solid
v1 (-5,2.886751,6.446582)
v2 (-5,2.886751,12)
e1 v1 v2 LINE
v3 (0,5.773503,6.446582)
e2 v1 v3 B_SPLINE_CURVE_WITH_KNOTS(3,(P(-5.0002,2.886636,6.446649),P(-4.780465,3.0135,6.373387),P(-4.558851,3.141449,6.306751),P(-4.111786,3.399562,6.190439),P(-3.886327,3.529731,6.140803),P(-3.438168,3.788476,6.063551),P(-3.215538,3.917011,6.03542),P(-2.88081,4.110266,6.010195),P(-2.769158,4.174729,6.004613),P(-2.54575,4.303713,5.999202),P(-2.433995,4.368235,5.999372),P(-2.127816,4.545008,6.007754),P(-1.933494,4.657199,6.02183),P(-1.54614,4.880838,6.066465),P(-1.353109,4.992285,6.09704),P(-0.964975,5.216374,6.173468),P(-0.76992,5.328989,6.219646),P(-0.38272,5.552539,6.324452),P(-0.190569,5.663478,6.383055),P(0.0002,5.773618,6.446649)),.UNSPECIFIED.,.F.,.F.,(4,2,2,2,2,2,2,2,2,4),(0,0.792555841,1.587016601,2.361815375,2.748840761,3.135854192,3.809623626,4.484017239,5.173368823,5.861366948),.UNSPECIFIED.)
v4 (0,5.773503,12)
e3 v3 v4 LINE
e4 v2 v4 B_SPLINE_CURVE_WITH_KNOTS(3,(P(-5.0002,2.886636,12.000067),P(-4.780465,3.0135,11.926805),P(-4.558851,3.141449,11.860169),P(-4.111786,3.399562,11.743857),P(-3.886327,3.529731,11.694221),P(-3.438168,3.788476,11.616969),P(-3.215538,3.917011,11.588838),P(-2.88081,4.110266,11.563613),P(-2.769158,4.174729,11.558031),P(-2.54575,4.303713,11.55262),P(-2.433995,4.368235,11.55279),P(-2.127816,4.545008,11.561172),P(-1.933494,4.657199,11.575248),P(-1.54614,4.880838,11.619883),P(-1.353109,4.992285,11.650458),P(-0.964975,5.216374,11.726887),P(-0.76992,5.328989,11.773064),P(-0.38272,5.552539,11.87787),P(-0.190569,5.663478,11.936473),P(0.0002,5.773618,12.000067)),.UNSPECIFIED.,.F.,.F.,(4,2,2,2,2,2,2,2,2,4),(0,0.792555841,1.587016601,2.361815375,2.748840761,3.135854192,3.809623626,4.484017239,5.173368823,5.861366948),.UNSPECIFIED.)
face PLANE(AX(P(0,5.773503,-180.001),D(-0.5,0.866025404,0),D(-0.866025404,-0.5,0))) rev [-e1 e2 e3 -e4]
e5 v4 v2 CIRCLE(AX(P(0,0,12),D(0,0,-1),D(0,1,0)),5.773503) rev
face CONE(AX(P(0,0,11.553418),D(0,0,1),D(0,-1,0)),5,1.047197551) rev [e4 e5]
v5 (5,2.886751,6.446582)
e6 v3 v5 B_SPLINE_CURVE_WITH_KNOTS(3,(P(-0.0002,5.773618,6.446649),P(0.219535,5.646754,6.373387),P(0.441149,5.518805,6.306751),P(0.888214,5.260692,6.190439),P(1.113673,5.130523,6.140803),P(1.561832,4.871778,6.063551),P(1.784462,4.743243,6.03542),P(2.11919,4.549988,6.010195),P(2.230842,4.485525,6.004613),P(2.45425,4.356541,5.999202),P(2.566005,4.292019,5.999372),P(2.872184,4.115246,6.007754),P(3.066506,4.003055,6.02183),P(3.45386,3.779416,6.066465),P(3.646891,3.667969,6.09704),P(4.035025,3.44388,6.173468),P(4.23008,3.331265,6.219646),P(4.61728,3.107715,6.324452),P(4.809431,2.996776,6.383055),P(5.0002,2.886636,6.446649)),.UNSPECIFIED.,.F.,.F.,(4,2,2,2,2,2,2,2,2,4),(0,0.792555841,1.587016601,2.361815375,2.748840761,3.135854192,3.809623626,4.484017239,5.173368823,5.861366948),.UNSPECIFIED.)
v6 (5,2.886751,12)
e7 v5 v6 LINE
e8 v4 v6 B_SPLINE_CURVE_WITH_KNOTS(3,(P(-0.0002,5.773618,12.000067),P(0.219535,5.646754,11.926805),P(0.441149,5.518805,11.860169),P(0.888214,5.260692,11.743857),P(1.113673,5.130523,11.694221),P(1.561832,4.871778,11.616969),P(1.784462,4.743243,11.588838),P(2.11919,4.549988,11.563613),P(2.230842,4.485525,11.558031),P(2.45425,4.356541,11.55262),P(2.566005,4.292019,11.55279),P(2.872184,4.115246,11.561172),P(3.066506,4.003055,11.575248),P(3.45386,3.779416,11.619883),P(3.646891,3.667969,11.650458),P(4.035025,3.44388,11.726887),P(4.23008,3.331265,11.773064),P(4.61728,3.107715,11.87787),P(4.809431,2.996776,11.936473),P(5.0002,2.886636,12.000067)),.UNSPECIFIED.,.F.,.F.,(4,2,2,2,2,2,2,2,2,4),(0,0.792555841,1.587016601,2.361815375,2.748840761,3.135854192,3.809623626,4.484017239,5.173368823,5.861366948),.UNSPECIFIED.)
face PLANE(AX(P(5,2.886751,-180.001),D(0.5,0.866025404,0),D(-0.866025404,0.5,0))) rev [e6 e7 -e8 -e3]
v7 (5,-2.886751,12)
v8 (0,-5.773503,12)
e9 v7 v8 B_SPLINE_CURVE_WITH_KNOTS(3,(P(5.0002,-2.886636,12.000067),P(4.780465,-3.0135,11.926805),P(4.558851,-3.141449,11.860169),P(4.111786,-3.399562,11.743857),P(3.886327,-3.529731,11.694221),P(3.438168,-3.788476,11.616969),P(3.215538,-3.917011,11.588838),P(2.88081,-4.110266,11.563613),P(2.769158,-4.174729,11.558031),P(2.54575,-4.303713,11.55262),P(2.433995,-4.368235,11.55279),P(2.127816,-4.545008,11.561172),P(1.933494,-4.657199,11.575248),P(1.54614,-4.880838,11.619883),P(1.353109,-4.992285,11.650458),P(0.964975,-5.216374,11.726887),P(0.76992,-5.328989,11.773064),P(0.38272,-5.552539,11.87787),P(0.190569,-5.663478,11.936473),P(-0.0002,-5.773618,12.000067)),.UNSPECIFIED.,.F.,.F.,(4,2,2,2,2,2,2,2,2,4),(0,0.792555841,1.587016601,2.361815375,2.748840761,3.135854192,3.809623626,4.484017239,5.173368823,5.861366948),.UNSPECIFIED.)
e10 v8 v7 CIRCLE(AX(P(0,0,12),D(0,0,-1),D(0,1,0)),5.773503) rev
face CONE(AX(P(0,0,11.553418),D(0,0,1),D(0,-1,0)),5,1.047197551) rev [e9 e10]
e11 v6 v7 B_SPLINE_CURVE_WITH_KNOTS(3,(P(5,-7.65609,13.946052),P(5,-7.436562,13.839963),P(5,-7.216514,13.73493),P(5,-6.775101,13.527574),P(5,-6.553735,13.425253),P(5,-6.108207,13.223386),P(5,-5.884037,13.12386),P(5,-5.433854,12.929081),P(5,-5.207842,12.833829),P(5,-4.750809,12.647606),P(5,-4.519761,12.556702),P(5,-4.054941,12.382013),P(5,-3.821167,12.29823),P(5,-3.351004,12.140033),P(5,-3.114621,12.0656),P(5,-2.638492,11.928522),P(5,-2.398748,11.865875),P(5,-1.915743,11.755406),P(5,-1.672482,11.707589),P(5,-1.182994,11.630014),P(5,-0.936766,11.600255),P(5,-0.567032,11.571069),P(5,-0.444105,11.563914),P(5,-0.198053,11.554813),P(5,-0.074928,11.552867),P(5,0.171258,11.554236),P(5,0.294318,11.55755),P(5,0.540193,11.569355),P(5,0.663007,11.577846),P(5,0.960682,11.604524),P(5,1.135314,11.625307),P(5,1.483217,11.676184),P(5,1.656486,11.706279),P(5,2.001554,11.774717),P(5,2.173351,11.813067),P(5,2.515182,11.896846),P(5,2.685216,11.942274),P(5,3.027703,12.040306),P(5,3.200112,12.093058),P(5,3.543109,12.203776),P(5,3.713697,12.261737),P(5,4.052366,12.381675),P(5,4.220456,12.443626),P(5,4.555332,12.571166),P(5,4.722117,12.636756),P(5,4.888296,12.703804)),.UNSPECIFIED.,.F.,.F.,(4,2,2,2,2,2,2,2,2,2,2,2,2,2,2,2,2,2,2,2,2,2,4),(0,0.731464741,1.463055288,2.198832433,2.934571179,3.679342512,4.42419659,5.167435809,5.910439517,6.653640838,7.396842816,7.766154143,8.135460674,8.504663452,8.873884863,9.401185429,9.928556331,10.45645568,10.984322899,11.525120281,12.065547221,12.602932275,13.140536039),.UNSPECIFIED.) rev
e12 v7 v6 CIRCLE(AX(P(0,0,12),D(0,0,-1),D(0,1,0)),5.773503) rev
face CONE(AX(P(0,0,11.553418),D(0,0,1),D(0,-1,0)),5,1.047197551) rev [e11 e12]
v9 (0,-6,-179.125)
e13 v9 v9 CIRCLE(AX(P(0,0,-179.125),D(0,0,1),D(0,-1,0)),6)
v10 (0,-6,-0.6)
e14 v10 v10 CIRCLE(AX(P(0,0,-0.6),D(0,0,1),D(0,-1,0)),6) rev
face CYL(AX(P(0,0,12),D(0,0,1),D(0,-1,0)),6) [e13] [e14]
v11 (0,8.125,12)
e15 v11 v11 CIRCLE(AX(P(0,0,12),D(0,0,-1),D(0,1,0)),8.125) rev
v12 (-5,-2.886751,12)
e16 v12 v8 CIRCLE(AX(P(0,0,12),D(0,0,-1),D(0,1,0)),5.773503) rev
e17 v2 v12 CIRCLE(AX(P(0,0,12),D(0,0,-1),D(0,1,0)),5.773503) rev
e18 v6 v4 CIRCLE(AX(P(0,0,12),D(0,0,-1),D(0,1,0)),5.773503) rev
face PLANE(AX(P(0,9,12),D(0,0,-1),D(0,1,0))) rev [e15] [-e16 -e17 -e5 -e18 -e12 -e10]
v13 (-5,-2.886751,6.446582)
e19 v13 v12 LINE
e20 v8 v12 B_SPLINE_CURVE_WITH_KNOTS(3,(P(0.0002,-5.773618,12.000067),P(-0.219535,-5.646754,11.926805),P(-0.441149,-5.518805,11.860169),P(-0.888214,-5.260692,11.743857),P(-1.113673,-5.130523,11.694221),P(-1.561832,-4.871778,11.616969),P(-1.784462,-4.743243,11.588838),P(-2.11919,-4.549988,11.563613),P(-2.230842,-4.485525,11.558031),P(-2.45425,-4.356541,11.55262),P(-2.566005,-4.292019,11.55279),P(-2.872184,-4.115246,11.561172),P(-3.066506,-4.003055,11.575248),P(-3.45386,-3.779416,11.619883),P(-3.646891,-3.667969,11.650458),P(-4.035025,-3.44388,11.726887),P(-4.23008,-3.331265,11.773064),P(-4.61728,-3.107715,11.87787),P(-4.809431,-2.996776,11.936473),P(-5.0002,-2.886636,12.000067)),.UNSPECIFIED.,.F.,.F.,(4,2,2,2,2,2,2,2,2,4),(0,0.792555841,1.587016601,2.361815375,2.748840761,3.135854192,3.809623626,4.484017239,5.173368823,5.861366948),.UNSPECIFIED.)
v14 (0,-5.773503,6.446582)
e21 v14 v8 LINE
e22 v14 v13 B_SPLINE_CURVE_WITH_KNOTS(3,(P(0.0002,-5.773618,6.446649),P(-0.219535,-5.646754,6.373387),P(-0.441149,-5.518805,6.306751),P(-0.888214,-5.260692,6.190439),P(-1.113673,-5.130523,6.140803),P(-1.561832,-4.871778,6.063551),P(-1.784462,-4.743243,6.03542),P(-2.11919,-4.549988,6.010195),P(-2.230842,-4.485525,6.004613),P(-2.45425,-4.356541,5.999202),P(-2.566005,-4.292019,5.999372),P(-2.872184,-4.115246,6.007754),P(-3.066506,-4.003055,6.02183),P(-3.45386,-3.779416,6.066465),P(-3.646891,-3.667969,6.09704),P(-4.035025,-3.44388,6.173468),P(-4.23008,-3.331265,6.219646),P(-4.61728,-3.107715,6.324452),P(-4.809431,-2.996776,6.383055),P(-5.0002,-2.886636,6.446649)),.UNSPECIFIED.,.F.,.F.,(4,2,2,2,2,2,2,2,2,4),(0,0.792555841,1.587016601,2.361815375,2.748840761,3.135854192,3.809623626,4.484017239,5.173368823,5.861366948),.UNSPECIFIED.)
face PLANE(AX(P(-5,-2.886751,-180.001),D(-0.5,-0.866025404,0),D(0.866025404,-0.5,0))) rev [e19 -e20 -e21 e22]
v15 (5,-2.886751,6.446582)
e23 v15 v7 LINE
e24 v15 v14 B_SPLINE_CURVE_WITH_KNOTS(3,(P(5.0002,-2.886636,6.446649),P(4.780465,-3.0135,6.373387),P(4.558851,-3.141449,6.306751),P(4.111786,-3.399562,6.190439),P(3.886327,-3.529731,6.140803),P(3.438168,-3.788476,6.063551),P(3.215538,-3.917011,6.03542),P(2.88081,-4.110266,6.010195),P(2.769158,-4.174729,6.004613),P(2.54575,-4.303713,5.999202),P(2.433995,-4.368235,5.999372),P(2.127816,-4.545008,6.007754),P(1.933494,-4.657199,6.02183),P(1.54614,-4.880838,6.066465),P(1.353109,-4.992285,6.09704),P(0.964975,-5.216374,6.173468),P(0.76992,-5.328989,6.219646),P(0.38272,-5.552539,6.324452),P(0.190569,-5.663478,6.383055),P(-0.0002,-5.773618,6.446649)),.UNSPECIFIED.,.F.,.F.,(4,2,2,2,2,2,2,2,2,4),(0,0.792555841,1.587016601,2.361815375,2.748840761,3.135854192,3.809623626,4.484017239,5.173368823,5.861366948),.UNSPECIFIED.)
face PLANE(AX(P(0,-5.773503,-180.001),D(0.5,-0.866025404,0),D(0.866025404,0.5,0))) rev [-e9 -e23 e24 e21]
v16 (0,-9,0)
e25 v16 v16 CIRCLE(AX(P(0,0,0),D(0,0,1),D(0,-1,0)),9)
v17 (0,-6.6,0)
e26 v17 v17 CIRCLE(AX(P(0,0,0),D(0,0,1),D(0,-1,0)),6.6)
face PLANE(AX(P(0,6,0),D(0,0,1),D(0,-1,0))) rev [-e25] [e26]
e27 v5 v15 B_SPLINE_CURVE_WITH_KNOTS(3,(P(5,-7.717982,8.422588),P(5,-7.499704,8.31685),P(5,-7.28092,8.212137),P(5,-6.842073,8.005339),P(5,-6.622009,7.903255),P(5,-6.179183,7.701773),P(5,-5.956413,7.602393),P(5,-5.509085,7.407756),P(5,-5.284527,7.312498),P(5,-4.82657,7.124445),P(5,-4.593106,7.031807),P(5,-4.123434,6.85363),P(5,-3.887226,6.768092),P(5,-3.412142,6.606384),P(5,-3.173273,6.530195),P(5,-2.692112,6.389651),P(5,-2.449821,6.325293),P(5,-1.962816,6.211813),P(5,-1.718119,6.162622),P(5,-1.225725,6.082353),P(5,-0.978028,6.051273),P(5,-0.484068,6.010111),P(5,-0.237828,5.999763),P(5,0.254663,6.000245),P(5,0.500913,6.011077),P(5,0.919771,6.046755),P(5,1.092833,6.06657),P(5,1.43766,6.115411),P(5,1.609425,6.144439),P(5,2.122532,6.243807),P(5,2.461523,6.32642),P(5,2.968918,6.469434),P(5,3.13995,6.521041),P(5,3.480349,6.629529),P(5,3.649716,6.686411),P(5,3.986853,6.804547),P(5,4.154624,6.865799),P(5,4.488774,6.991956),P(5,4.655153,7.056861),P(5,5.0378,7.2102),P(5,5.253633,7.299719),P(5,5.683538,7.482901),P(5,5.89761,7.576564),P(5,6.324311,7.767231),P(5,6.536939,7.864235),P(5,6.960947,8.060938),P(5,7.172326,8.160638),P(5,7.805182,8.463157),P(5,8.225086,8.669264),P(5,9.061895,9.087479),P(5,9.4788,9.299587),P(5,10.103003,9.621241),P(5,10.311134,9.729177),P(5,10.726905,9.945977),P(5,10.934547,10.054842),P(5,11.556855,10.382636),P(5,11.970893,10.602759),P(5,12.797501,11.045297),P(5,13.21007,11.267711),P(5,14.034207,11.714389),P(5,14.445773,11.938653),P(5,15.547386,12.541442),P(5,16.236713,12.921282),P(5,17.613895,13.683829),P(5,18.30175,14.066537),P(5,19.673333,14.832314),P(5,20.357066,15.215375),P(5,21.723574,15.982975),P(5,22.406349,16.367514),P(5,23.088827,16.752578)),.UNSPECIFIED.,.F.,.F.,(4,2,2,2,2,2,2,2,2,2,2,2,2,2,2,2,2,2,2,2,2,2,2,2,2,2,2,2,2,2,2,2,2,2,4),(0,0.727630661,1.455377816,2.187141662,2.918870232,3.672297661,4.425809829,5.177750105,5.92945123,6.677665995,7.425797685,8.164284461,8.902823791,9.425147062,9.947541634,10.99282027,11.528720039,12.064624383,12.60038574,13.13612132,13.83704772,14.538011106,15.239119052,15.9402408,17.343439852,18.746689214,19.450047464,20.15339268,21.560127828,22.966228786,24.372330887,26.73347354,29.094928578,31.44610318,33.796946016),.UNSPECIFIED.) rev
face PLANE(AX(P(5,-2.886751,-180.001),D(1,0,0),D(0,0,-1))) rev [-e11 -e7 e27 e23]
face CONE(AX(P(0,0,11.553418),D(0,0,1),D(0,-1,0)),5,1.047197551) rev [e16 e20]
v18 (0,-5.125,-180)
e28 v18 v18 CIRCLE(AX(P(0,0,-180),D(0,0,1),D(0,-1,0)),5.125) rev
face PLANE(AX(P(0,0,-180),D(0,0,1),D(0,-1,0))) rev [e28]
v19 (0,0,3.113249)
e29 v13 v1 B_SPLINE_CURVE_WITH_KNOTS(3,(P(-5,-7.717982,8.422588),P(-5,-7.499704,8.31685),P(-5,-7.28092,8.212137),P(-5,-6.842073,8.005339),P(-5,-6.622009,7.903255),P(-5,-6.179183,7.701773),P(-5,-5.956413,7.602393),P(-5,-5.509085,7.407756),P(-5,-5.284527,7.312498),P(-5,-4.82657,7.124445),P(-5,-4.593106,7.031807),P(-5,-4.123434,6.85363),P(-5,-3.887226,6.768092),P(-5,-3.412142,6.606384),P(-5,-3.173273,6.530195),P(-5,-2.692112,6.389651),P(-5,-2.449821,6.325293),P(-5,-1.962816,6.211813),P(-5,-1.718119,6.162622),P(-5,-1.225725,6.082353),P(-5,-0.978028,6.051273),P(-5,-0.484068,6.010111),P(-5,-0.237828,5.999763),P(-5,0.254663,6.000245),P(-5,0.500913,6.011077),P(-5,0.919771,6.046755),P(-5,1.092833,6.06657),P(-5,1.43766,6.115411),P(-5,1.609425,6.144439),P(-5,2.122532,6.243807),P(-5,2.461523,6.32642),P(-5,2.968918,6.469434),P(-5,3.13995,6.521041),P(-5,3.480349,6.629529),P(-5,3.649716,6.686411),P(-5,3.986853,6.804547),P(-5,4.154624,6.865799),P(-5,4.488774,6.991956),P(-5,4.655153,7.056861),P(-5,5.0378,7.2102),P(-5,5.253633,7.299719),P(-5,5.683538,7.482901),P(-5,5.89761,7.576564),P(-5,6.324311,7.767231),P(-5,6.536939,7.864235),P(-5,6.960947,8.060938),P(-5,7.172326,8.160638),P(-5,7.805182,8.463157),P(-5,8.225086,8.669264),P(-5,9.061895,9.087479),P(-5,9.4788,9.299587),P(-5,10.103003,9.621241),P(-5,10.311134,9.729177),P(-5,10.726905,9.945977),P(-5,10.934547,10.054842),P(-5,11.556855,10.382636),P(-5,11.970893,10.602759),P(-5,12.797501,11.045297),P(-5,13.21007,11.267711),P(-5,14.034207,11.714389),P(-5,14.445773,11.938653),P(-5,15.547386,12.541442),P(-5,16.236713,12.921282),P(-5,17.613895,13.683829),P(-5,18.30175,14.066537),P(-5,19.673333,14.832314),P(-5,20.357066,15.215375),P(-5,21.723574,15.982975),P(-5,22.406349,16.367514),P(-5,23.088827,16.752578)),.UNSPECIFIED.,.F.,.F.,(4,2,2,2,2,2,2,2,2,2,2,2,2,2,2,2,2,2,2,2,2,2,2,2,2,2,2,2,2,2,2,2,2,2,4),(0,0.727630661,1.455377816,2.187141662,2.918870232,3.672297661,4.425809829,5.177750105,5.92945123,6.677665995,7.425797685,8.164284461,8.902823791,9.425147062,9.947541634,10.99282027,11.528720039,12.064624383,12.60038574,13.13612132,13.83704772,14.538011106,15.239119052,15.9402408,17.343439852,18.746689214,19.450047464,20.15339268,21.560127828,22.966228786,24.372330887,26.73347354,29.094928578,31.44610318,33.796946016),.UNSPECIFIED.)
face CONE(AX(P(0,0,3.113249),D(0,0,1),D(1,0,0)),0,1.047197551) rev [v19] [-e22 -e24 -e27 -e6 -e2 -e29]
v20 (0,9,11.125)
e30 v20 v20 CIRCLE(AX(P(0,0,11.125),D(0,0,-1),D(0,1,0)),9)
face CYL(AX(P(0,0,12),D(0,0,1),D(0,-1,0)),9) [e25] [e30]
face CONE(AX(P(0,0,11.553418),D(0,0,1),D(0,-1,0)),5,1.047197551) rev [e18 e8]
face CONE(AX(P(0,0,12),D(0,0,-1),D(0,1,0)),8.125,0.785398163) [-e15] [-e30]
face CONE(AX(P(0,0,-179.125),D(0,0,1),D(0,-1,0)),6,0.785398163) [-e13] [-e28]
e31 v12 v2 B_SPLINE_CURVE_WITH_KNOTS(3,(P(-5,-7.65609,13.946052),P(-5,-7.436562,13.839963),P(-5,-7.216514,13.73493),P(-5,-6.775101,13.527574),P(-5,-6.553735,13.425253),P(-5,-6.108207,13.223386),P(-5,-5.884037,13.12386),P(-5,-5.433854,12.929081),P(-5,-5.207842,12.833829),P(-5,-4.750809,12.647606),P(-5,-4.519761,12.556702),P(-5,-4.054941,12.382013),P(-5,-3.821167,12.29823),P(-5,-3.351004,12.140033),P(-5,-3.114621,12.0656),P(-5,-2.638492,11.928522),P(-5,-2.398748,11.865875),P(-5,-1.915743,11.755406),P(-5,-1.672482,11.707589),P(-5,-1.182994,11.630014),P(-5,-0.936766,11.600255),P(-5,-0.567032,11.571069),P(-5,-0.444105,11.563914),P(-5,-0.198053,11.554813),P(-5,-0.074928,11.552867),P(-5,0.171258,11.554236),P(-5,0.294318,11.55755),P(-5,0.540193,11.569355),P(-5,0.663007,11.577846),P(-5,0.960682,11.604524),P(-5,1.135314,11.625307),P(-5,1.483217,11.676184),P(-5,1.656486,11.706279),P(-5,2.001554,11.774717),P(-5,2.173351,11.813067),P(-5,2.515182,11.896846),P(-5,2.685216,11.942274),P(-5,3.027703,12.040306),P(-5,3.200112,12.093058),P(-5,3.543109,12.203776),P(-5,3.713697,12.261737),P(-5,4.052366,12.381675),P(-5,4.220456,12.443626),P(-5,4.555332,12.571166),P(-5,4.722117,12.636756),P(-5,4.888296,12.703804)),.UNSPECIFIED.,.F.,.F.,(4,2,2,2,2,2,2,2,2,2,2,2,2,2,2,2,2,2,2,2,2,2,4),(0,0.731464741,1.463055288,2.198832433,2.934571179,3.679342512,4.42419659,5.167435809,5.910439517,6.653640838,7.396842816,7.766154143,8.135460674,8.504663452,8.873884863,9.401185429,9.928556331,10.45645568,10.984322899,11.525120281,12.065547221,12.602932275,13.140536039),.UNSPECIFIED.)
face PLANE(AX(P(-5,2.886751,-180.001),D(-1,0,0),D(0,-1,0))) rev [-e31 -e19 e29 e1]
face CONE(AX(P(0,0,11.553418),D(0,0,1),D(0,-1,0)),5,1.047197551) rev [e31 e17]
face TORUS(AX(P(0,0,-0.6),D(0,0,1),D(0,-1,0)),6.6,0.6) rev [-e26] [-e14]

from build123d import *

# Parameters (mm, degrees)
CHAMFER1_SIZE      = 0.875
CUT_EXTRUDE1_REACH = 194.421
FILLET2_R          = 0.6


with BuildPart() as part:
    # Sketch1 → Revolve1 (revolve)
    with BuildSketch(Plane(origin=(0, 0, 0), x_dir=(0, 0, -1), z_dir=(1, 0, 0))):
        Polygon((0, 9), (-12, 9), (-12, 0), (180, 0), (180, 6), (0, 6), align=None)
    revolve(axis=Axis((0, 0, 12), (0, 0, -1)))

    # Sketch7 → Cut-Revolve2 (revolve, cut)
    with BuildSketch(Plane(origin=(0, 0, 0), x_dir=(0, 0, -1), z_dir=(1, 0, 0))):
        Polygon((-12, 0), (-12, 5), (-6, 5), (-3.113248654, 0), align=None)
    revolve(axis=Axis((0, 0, 12), (0, 0, -1)), mode=Mode.SUBTRACT)

    # Chamfer1
    chamfer1_edges = [part.edges().sort_by_distance(p)[0] for p in [
        (0, -6, -180),
        (0, -9, 12),
    ]]
    chamfer(chamfer1_edges, length=CHAMFER1_SIZE)

    # Cut-Extrude1: up to this cone (the profile starts inside it)
    cut_extrude1_end = Plane(origin=(0, 0, 12), z_dir=(0, 0, 1)).offset(-8.886750346) * Cone(1.732e-06, 379.665634345, 219.200055191, align=(Align.CENTER, Align.CENTER, Align.MIN), mode=Mode.PRIVATE)
    # Sketch8 → Cut-Extrude1 (cut, up to the surface)
    with BuildSketch(Plane.XY.offset(12), mode=Mode.PRIVATE) as cut_extrude1_sk1:
        Polygon((0, 5.773502692), (-5, 2.886751346), (-5, -2.886751346), (0, -5.773502692), (5, -2.886751346), (5, 2.886751346), align=None)
    cut_extrude1_tool1 = extrude(cut_extrude1_sk1.sketch, amount=-CUT_EXTRUDE1_REACH, mode=Mode.PRIVATE) & cut_extrude1_end
    add(cut_extrude1_tool1.solids().sort_by_distance((0, 0, 12))[0], mode=Mode.SUBTRACT)

    # Sketch9 → Cut-Revolve3 (revolve, cut)
    with BuildSketch(Plane(origin=(0, 0, 0), x_dir=(0, 0, -1), z_dir=(1, 0, 0))):
        Polygon((-12.5, 6.639528096), (-12.5, 5), (-11.553418013, 5), align=None)
    revolve(axis=Axis((0, 0, 12), (0, 0, -1)), mode=Mode.SUBTRACT)

    # Fillet2
    fillet2_edges = [part.edges().sort_by_distance(p)[0] for p in [
        (0, -6, 0),
    ]]
    fillet(fillet2_edges, radius=FILLET2_R)


solid = part.part
